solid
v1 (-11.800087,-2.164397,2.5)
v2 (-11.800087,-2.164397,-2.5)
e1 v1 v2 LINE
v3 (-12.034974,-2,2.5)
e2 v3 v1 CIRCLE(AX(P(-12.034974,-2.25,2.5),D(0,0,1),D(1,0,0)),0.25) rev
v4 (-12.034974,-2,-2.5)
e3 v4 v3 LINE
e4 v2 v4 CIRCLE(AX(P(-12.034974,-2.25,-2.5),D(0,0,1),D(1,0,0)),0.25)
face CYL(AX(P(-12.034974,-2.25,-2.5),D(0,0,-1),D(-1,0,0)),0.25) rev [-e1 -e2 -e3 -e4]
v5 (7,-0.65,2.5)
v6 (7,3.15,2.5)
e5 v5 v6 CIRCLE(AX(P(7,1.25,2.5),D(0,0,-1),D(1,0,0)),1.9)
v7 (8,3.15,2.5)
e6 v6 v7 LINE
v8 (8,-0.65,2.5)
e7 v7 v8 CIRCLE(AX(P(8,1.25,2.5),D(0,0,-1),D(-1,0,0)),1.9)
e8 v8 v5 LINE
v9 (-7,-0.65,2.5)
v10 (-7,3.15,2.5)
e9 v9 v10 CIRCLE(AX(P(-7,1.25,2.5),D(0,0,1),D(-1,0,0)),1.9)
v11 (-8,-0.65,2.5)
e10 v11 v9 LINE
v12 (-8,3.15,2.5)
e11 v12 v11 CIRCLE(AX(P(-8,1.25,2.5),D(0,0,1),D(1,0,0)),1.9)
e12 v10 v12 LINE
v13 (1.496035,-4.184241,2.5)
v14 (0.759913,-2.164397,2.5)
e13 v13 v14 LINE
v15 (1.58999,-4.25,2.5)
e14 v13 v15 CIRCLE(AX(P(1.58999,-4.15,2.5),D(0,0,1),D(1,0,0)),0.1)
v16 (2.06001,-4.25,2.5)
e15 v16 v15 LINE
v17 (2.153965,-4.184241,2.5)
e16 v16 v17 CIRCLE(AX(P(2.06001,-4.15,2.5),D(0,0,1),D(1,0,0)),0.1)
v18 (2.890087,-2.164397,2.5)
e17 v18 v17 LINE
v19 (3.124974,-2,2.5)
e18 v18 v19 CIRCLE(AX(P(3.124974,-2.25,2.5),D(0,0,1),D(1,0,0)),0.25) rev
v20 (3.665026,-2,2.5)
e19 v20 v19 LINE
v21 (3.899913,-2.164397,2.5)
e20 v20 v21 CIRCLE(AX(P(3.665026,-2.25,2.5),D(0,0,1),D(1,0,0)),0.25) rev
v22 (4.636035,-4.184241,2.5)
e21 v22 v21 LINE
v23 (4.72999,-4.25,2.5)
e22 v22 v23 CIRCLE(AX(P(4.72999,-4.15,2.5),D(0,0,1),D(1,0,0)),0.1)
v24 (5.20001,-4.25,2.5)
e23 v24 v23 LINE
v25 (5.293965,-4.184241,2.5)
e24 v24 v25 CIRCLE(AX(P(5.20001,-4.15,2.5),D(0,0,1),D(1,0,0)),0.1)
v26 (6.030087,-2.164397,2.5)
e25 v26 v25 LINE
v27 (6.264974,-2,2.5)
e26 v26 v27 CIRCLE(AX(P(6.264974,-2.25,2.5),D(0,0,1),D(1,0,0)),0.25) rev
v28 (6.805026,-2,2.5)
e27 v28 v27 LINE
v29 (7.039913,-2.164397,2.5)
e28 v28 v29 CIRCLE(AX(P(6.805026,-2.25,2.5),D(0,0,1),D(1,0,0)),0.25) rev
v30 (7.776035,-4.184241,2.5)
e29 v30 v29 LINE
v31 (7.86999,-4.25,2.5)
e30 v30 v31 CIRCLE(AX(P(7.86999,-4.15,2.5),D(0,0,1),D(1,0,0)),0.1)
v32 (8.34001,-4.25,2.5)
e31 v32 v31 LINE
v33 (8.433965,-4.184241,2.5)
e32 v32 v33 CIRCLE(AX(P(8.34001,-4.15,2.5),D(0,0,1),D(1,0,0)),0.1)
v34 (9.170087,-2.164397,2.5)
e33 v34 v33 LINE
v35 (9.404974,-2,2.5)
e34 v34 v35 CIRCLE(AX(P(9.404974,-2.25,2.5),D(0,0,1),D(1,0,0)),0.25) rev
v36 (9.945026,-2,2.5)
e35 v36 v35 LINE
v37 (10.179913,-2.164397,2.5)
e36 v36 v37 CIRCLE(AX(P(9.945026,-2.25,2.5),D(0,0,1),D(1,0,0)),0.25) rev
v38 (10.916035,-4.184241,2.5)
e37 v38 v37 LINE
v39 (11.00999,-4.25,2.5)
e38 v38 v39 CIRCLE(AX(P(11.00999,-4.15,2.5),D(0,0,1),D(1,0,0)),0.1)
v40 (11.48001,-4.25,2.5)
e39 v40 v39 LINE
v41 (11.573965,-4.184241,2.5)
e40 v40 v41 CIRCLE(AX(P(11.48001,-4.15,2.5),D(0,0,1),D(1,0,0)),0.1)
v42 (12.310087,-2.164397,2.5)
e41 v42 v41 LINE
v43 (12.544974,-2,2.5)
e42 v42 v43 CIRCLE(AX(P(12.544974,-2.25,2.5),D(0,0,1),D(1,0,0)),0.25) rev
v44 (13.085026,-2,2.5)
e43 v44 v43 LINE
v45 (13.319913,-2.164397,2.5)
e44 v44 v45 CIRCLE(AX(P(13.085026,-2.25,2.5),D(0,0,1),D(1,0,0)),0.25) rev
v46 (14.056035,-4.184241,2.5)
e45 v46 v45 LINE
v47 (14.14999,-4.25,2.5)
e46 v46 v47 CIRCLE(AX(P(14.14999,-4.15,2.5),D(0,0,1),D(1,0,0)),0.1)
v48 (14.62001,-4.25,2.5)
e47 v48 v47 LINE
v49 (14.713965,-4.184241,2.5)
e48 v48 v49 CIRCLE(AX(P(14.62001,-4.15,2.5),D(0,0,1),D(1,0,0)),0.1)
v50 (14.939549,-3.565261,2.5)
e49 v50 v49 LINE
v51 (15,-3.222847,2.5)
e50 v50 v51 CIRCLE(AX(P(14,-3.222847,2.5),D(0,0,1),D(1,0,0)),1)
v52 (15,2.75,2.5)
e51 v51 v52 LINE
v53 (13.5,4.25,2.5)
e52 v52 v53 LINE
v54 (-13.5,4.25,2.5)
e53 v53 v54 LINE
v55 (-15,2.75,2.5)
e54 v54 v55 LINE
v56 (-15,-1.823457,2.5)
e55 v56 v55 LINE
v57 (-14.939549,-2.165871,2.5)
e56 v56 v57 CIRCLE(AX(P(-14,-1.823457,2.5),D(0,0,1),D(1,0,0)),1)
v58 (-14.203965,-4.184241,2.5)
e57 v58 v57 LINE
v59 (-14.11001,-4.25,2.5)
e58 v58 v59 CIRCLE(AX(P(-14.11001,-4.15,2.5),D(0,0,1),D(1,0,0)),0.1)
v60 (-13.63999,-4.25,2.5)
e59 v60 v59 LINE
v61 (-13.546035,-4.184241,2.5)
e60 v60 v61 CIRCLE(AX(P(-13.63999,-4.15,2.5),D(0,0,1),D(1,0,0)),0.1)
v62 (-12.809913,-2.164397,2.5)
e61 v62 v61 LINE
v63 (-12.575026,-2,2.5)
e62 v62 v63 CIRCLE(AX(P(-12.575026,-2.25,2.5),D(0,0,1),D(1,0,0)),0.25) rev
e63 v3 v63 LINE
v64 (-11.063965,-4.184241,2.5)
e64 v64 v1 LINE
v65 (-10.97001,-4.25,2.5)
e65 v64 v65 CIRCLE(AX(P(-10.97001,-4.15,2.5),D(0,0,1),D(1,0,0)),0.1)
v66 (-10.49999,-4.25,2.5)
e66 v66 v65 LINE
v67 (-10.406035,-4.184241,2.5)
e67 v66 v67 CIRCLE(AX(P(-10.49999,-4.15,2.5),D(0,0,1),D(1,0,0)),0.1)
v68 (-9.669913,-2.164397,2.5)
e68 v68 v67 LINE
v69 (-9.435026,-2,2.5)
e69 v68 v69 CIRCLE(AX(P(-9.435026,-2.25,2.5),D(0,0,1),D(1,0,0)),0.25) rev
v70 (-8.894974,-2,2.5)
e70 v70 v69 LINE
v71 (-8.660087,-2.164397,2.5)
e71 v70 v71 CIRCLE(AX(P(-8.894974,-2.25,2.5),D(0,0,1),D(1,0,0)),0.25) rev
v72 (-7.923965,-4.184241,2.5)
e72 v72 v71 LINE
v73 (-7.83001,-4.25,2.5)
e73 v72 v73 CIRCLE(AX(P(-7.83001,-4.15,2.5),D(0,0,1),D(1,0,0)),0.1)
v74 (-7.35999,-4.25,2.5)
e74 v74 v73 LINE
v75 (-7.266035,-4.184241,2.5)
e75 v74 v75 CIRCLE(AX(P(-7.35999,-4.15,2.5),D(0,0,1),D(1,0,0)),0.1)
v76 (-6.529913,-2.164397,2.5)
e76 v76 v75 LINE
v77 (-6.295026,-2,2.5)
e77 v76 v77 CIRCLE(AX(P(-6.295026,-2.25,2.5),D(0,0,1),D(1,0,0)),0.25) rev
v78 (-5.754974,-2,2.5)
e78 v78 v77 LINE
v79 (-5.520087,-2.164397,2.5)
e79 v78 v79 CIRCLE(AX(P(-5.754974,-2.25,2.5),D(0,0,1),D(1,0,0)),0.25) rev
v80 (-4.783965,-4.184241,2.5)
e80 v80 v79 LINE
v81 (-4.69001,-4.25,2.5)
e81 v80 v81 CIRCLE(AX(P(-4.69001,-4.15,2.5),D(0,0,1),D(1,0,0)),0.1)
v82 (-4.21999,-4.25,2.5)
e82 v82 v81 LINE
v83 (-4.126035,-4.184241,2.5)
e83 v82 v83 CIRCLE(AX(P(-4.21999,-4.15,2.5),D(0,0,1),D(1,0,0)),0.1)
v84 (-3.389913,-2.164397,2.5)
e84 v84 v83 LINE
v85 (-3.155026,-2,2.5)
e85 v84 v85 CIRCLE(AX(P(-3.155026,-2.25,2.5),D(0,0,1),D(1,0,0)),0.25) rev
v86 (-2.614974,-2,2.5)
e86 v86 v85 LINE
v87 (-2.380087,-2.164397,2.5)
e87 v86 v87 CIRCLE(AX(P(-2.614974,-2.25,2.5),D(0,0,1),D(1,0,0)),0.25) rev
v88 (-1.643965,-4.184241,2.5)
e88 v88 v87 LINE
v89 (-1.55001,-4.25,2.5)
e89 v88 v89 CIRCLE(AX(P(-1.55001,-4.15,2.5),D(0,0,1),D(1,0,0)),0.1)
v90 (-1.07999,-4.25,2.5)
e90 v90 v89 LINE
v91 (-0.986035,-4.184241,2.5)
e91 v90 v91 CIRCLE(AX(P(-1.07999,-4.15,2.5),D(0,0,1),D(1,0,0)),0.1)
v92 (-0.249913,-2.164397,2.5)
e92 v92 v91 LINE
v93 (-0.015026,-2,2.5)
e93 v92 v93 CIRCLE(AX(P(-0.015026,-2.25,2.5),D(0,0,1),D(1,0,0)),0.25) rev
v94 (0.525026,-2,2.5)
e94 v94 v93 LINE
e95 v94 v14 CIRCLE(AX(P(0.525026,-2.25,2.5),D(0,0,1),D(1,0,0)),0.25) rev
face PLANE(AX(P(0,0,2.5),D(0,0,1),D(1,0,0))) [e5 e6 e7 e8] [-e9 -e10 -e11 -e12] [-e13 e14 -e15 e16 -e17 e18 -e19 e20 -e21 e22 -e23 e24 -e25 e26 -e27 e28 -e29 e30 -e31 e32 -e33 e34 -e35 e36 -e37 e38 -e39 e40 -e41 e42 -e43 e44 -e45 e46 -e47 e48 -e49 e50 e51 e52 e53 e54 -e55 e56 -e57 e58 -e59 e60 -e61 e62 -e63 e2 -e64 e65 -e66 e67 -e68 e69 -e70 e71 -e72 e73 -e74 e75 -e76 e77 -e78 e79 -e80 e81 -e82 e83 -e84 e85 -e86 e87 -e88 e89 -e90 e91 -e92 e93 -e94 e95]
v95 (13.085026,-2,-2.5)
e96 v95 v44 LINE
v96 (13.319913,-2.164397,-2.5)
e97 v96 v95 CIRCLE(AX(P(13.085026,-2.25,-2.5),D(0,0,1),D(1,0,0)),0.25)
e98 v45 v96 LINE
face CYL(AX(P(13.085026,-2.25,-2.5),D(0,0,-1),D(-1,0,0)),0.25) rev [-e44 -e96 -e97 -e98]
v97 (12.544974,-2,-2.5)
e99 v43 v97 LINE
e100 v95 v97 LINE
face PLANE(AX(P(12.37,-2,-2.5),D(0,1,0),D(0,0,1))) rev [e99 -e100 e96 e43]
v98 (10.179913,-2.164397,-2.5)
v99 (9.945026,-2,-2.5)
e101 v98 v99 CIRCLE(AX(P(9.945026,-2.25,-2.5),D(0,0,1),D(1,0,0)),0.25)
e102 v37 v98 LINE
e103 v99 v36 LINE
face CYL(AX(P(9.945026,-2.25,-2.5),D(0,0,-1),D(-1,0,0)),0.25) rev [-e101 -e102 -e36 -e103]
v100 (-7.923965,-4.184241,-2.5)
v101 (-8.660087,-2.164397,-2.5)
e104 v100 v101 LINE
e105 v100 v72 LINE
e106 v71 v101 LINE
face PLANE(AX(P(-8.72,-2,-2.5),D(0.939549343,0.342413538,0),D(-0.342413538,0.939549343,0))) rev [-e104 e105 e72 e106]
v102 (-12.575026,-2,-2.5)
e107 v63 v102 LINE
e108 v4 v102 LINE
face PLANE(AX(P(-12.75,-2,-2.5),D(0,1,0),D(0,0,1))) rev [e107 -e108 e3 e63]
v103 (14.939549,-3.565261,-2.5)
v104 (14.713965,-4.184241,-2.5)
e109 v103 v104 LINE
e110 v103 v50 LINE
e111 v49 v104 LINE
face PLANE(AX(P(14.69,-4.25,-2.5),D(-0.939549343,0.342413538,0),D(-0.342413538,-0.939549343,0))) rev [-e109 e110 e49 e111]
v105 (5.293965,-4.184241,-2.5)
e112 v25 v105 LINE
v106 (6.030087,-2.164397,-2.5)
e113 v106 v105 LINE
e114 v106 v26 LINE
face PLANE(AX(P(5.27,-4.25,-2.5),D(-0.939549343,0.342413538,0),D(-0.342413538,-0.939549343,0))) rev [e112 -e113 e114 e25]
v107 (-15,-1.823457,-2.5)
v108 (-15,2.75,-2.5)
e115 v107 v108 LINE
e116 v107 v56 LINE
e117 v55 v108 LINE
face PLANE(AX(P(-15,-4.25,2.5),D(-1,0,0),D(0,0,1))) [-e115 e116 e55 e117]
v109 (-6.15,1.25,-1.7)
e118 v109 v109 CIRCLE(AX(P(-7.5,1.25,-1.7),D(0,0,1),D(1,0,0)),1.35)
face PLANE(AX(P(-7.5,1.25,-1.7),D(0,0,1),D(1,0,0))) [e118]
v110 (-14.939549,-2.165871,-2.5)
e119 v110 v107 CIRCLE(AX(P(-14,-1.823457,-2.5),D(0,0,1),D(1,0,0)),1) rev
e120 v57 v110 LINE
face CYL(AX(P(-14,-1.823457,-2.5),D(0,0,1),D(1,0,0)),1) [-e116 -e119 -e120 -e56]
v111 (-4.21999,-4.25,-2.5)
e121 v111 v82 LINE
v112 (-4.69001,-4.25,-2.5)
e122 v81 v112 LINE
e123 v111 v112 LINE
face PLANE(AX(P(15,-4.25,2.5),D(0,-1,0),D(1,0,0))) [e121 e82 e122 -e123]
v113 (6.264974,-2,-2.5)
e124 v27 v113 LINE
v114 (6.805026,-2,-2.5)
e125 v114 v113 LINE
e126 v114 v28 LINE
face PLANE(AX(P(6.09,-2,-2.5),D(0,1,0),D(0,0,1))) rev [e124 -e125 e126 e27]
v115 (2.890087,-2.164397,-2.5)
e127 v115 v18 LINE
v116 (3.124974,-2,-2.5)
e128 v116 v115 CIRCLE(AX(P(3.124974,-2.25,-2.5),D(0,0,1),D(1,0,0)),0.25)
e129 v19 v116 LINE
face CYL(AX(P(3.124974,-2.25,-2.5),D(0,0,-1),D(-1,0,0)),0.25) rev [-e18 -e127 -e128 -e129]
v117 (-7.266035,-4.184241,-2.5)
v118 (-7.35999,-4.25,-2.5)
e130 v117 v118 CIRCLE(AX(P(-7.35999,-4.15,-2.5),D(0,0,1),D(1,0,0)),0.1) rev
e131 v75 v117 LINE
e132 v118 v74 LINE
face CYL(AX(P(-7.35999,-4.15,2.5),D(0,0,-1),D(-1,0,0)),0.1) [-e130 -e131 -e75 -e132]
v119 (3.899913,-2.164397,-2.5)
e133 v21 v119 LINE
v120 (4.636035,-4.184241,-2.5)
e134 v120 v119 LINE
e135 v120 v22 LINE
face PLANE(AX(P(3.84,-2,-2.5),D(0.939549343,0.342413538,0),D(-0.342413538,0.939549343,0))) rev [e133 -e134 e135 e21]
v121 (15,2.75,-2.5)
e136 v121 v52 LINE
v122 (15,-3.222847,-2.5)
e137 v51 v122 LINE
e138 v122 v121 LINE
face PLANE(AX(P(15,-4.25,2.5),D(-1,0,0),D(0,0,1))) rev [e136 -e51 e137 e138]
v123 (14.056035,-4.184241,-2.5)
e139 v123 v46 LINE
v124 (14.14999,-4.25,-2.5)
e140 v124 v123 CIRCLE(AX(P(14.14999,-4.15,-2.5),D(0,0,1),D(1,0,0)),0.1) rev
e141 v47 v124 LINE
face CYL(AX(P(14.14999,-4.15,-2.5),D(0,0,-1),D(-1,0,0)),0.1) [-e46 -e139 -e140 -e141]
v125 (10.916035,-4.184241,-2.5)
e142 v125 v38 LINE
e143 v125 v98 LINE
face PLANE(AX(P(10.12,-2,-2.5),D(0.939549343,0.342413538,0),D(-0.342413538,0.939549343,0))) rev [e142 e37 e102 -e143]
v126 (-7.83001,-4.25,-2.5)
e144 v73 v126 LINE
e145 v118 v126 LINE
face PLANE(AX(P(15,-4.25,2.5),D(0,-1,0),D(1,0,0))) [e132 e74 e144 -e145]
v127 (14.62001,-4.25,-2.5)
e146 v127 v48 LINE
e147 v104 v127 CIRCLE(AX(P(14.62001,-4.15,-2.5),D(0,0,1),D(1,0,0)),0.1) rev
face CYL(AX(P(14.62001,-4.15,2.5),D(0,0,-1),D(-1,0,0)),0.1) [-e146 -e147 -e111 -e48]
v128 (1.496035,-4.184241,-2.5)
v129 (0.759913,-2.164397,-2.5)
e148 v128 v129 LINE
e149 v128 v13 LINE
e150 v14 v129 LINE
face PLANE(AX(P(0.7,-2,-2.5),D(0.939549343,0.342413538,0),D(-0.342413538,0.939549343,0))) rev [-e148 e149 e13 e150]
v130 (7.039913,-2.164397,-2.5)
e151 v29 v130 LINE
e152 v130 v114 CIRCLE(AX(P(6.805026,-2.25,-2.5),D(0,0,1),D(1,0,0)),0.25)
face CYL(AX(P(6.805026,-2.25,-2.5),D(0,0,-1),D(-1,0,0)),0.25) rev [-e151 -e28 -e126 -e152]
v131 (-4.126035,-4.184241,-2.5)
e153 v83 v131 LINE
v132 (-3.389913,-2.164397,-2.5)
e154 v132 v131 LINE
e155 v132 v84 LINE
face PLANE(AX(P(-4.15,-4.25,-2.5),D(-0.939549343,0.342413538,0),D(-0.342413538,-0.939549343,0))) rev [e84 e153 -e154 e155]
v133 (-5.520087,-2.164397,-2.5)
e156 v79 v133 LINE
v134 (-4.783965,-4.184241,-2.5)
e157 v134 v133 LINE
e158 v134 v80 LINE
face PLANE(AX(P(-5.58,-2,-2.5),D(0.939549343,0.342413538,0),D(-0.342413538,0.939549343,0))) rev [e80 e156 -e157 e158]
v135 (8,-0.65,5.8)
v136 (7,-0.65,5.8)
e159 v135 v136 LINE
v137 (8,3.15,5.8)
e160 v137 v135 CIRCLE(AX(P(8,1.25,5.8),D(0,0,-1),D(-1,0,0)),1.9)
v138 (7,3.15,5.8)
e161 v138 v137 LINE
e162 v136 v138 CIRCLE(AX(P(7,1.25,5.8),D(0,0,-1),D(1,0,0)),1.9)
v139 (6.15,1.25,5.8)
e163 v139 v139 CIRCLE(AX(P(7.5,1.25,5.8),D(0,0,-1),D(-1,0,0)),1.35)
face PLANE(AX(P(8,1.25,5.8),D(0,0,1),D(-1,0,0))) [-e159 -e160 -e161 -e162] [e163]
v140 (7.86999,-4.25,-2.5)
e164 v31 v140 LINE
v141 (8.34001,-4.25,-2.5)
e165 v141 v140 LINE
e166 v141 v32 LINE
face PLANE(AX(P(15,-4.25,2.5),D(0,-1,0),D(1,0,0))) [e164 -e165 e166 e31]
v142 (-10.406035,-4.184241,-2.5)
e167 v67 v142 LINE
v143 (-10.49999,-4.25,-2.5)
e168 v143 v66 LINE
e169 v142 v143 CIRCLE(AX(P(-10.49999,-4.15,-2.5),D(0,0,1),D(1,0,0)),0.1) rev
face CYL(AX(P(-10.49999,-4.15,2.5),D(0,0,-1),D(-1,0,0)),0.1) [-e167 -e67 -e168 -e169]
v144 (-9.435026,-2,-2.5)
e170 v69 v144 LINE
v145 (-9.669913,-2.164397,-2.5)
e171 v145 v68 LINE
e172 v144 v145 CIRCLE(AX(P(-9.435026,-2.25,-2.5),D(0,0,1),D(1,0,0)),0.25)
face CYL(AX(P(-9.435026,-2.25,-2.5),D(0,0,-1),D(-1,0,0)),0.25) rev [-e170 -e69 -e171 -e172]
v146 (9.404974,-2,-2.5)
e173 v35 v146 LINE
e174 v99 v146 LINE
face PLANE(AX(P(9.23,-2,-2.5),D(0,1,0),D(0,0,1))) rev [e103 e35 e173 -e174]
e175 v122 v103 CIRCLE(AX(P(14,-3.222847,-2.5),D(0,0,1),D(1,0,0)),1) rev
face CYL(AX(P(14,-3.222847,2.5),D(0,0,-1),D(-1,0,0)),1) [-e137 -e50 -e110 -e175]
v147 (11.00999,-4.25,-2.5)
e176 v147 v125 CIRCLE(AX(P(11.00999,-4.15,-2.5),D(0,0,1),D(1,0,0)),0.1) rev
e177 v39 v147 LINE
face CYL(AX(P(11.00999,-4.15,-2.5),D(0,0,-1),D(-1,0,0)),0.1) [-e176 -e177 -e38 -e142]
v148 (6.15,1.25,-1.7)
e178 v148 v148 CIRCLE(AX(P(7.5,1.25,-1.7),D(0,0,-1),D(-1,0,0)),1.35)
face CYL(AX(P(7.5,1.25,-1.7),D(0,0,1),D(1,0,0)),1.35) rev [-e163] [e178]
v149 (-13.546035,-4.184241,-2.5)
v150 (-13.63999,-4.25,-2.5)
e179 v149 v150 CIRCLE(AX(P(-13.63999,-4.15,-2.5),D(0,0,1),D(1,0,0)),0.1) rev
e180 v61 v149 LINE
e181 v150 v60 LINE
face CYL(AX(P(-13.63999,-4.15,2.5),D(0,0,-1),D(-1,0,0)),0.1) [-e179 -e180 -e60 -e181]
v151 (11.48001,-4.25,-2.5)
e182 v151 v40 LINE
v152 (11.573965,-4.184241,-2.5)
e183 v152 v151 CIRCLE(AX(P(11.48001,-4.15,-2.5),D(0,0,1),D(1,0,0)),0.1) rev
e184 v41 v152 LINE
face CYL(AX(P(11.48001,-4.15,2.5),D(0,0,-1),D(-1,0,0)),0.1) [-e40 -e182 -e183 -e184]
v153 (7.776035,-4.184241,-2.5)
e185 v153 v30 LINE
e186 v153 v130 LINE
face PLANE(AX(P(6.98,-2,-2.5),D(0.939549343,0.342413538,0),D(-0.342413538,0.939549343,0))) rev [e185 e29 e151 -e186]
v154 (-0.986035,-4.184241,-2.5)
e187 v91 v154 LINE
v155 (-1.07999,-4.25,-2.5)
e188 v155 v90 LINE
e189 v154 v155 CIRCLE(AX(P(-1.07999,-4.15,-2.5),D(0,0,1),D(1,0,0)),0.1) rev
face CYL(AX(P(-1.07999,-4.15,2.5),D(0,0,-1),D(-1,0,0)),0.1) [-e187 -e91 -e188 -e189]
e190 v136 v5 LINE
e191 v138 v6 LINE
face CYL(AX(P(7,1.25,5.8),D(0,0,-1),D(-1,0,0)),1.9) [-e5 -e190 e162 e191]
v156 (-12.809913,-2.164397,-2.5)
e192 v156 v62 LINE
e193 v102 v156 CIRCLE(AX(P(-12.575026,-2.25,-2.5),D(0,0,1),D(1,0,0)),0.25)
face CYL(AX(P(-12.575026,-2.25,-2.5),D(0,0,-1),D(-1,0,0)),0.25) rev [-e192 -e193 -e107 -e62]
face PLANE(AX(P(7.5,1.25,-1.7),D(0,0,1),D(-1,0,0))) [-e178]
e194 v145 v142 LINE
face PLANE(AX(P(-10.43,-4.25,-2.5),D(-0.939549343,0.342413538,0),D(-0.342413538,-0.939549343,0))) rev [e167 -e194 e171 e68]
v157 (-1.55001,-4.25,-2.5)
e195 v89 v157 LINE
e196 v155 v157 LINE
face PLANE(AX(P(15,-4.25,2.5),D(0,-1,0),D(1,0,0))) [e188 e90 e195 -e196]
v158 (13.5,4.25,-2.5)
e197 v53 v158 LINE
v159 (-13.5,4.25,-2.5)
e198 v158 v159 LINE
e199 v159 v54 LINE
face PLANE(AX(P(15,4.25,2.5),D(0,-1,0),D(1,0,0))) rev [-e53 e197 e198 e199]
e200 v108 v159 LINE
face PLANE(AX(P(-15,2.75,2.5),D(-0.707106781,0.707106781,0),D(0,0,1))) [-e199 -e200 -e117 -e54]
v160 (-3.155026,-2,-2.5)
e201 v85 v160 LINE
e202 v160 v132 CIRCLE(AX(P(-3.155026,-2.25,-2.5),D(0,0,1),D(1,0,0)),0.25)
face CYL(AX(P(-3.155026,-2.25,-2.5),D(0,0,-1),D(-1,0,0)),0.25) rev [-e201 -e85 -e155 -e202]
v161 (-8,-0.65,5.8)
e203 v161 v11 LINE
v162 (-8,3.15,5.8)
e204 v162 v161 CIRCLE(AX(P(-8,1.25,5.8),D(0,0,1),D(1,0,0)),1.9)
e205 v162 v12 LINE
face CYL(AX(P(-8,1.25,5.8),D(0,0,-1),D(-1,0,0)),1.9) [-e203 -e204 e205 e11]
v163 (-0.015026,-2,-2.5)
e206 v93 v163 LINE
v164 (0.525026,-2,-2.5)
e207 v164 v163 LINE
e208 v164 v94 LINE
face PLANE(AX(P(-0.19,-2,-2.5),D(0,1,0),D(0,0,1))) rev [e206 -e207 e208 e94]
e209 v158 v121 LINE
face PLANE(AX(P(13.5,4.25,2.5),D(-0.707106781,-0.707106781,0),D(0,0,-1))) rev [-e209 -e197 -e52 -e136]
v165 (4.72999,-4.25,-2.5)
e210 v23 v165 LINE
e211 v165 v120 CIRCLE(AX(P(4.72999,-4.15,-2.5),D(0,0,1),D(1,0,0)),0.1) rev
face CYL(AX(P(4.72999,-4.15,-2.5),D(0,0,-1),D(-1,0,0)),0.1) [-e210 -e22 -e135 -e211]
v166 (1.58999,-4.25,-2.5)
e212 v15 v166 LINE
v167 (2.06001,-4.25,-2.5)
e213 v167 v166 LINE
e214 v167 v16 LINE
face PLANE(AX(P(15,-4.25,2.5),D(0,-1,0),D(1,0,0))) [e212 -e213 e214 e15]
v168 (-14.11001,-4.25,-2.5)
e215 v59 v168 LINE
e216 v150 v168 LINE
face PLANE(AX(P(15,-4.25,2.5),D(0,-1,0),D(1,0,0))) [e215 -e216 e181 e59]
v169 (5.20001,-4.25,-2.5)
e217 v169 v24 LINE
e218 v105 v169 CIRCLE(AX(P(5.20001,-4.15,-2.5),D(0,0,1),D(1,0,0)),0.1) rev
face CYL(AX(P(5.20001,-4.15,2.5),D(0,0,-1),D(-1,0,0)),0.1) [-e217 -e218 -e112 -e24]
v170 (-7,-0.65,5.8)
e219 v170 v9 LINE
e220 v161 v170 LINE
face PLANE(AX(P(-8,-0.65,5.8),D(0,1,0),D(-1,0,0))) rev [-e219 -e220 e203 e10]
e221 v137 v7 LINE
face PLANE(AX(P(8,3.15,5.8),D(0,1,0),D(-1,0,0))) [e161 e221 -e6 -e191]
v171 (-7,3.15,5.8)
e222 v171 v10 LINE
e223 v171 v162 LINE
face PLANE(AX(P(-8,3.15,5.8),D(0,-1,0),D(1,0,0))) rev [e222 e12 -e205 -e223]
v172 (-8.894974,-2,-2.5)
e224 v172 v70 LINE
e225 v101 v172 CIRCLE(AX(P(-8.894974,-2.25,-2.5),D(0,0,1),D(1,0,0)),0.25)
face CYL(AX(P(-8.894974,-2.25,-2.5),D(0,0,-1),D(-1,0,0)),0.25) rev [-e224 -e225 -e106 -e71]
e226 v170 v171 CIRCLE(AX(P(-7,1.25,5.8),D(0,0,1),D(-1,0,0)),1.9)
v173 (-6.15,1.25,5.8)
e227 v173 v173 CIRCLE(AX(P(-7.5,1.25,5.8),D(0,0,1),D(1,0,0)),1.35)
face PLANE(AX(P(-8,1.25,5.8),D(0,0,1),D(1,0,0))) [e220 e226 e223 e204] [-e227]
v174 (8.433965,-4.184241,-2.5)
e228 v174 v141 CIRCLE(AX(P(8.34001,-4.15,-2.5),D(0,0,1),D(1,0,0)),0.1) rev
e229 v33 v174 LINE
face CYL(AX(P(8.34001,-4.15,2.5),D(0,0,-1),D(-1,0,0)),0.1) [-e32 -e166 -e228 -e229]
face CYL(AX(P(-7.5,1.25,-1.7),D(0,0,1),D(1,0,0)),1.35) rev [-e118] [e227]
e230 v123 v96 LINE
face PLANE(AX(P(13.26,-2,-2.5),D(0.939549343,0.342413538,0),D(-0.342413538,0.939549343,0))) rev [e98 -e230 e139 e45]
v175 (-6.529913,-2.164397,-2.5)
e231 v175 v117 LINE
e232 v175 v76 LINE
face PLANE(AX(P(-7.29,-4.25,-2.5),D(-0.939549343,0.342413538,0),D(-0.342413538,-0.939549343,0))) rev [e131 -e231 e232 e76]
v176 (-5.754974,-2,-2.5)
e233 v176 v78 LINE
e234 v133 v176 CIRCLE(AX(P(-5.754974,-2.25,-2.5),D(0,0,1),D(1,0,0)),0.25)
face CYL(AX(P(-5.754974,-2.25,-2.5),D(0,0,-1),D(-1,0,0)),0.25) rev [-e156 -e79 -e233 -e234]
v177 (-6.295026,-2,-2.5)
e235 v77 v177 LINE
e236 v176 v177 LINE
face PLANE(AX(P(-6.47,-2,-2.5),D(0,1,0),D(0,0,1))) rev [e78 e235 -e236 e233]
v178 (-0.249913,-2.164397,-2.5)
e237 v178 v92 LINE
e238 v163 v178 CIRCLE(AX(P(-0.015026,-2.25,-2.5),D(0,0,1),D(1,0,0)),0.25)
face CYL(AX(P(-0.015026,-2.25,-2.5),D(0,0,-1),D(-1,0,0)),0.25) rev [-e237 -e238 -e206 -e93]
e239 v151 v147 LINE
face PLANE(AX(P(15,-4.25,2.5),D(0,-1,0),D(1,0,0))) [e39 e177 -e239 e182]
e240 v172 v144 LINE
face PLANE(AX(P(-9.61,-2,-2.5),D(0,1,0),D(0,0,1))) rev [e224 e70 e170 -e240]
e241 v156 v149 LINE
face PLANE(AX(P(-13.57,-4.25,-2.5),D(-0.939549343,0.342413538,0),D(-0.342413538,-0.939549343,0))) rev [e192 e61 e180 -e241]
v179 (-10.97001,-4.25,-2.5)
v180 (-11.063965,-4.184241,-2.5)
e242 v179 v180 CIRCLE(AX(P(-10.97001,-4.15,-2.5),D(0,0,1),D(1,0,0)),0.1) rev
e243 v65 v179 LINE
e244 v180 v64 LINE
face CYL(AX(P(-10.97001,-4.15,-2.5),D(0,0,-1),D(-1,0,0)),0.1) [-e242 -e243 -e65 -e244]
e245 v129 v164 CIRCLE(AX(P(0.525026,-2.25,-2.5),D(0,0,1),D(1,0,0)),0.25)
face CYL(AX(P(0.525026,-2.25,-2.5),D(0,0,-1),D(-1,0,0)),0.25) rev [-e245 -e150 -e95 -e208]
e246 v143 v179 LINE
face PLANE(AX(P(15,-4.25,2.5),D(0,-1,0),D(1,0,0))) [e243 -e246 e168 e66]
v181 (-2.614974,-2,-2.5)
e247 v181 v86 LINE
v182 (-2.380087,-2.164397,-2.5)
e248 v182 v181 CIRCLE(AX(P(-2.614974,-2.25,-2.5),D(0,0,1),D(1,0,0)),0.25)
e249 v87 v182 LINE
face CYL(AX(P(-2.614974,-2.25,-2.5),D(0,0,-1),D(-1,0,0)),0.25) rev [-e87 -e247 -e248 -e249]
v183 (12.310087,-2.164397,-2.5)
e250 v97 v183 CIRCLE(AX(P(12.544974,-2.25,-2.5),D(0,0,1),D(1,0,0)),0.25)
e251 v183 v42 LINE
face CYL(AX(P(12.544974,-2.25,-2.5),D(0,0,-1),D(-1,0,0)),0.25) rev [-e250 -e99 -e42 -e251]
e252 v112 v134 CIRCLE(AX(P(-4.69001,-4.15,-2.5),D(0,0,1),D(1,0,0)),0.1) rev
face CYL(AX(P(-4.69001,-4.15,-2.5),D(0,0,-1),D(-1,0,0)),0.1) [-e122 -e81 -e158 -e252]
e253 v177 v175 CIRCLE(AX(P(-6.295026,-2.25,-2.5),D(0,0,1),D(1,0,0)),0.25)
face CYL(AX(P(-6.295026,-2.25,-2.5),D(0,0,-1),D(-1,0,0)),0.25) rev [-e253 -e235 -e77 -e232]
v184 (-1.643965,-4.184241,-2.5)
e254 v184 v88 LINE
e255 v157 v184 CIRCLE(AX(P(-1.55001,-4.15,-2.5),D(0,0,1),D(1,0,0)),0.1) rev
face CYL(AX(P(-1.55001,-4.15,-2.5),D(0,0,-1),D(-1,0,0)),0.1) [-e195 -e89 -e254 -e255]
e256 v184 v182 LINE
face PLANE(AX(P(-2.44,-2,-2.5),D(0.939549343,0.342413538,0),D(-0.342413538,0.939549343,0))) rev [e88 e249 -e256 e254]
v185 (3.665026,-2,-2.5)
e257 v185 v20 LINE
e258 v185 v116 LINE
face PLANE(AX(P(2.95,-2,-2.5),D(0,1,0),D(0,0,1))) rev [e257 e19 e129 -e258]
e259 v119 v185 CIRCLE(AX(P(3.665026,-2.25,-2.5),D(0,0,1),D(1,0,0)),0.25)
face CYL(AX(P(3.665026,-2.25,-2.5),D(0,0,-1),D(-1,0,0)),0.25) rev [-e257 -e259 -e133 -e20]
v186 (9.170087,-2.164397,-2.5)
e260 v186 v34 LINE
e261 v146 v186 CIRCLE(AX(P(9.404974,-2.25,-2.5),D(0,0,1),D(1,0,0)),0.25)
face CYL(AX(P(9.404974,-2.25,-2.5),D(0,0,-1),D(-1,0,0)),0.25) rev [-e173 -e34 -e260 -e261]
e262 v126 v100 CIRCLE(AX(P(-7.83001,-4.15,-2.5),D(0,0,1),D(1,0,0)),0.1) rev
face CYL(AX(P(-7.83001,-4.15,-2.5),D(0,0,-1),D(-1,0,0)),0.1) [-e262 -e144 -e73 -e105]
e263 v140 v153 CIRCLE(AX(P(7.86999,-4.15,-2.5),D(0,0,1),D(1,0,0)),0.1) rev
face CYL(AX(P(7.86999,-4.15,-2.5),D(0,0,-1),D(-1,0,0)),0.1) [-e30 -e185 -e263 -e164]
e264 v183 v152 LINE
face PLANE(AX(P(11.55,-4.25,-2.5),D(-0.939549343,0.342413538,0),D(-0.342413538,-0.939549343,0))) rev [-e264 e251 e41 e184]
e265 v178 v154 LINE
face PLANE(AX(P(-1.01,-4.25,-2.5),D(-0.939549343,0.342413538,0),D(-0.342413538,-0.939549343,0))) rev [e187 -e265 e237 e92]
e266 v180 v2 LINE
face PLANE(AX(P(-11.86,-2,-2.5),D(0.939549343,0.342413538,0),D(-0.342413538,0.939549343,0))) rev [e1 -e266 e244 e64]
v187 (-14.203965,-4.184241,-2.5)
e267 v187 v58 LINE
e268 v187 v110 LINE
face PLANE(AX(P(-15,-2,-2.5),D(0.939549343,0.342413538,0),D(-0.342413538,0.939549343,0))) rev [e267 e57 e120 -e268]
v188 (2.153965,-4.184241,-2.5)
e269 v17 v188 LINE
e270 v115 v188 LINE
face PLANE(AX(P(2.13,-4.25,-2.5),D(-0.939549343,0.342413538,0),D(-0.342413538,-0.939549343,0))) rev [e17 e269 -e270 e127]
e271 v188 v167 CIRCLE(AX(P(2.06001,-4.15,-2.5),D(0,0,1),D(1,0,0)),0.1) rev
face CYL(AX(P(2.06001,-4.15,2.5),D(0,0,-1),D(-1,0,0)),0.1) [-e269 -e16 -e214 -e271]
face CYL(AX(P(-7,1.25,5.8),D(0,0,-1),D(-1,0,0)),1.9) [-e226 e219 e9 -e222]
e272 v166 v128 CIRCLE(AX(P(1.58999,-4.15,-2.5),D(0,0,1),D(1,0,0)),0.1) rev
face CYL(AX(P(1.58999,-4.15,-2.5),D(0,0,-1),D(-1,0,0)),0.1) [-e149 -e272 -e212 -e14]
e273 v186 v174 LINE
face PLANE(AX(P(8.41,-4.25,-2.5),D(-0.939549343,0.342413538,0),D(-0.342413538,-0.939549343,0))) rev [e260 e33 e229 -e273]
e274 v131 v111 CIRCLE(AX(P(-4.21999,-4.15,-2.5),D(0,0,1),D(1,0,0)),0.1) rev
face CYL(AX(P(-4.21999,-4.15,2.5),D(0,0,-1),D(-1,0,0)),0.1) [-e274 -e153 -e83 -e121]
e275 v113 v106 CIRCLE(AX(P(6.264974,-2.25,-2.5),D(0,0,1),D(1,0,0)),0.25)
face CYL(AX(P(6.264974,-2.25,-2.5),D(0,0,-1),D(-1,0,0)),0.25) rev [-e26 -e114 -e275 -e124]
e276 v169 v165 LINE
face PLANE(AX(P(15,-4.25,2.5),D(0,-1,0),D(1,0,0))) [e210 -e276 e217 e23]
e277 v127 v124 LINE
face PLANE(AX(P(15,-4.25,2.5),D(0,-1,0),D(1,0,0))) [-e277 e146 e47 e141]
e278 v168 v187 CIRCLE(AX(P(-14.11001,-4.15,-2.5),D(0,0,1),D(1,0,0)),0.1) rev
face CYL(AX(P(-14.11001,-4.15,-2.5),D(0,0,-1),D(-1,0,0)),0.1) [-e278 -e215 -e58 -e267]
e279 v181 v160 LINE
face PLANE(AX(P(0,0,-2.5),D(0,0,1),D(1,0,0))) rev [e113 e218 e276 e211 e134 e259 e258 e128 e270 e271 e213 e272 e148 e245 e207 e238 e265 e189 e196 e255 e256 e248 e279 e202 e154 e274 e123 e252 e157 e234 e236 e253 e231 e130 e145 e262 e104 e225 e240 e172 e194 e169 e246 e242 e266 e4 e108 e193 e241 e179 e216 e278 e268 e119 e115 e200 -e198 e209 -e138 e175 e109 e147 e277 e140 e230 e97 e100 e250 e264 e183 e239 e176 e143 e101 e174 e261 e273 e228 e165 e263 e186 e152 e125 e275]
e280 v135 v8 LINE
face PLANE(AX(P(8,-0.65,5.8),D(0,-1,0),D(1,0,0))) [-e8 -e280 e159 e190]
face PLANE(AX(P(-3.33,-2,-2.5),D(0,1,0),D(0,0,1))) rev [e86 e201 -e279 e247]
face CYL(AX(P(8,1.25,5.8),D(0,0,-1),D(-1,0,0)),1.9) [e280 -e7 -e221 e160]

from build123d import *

# Parameters (mm, degrees)
SZKIC1_W                    = 30
SZKIC1_H                    = 8.5
DODANIE_WYCI_GNI_CIE1_DEPTH = 2.5
WYTNIJ_WYCI_GNI_CIE1_DEPTH  = 16.789632675
ZAOKR_GLENIE1_R             = 0.25
ZAOKR_GLENIE2_R             = 0.1
SZYK_START                  = -2.5
SZYK_LINIOWY1_DEPTH         = 5
ZAOKR_GLENIE3_R             = 1
DODANIE_WYCI_GNI_CIE2_DEPTH = 3.3
SZKIC4_R                    = 1.35
WYTNIJ_WYCI_GNI_CIE2_DEPTH  = 7.5
SFAZOWANIE1_SIZE            = 1.5


# Read off the part's stored shape, not the designer's step: Szyk liniowy1
with BuildPart() as part:
    # Szkic1 → Dodanie-wyciągnięcie1 (new, symmetric)
    with BuildSketch(Plane.XY):
        Rectangle(SZKIC1_W, SZKIC1_H)
    extrude(amount=DODANIE_WYCI_GNI_CIE1_DEPTH, both=True)

    # Szkic2 → Wytnij-wyciągnięcie1 (cut, symmetric)
    with BuildSketch(Plane.XY):
        Polygon((-13.57, -4.25), (-12.75, -2), (-11.86, -2), (-11.04, -4.25), align=None)
    extrude(amount=WYTNIJ_WYCI_GNI_CIE1_DEPTH, both=True, mode=Mode.SUBTRACT)

    # Zaokrąglenie1
    zaokr_glenie1_edges = [part.edges().sort_by_distance(p)[0] for p in [
        (-12.75, -2, 0),
        (-11.86, -2, 0),
    ]]
    fillet(zaokr_glenie1_edges, radius=ZAOKR_GLENIE1_R)

    # Zaokrąglenie2
    zaokr_glenie2_edges = [part.edges().sort_by_distance(p)[0] for p in [
        (-11.04, -4.25, 0),
        (-13.57, -4.25, 0),
    ]]
    fillet(zaokr_glenie2_edges, radius=ZAOKR_GLENIE2_R)

    # Szyk liniowy1 outline → Szyk liniowy1 (cut)
    with BuildSketch(Plane.XY.offset(SZYK_START)):
        with BuildLine():
            ThreePointArc((-8.660086567, -2.164396615), (-8.751622667, -2.045181975), (-8.894973903, -2))
            Line((-8.894973903, -2), (-9.435026097, -2))
            ThreePointArc((-9.435026097, -2), (-9.578377333, -2.045181975), (-9.669913433, -2.164396615))
            Line((-9.669913433, -2.164396615), (-10.406034627, -4.184241354))
            ThreePointArc((-10.406034627, -4.184241354), (-10.442649067, -4.23192721), (-10.499989561, -4.25))
            Line((-10.499989561, -4.25), (-7.830010439, -4.25))
            ThreePointArc((-7.830010439, -4.25), (-7.887350933, -4.23192721), (-7.923965373, -4.184241354))
            Line((-7.923965373, -4.184241354), (-8.660086567, -2.164396615))
        make_face()
        with BuildLine():
            ThreePointArc((14.713965373, -4.184241354), (14.677350933, -4.23192721), (14.620010439, -4.25))
            Line((14.620010439, -4.25), (15, -4.25))
            Line((15, -4.25), (15, -3.399390244))
            Line((15, -3.399390244), (14.713965373, -4.184241354))
        make_face()
        with BuildLine():
            ThreePointArc((11.573965373, -4.184241354), (11.537350933, -4.23192721), (11.480010439, -4.25))
            Line((11.480010439, -4.25), (14.149989561, -4.25))
            ThreePointArc((14.149989561, -4.25), (14.092649067, -4.23192721), (14.056034627, -4.184241354))
            Line((14.056034627, -4.184241354), (13.319913433, -2.164396615))
            ThreePointArc((13.319913433, -2.164396615), (13.228377333, -2.045181975), (13.085026097, -2))
            Line((13.085026097, -2), (12.544973903, -2))
            ThreePointArc((12.544973903, -2), (12.401622667, -2.045181975), (12.310086567, -2.164396615))
            Line((12.310086567, -2.164396615), (11.573965373, -4.184241354))
        make_face()
        with BuildLine():
            ThreePointArc((8.433965373, -4.184241354), (8.397350933, -4.23192721), (8.340010439, -4.25))
            Line((8.340010439, -4.25), (11.009989561, -4.25))
            ThreePointArc((11.009989561, -4.25), (10.952649067, -4.23192721), (10.916034627, -4.184241354))
            Line((10.916034627, -4.184241354), (10.179913433, -2.164396615))
            ThreePointArc((10.179913433, -2.164396615), (10.088377333, -2.045181975), (9.945026097, -2))
            Line((9.945026097, -2), (9.404973903, -2))
            ThreePointArc((9.404973903, -2), (9.261622667, -2.045181975), (9.170086567, -2.164396615))
            Line((9.170086567, -2.164396615), (8.433965373, -4.184241354))
        make_face()
        with BuildLine():
            ThreePointArc((5.293965373, -4.184241354), (5.257350933, -4.23192721), (5.200010439, -4.25))
            Line((5.200010439, -4.25), (7.869989561, -4.25))
            ThreePointArc((7.869989561, -4.25), (7.812649067, -4.23192721), (7.776034627, -4.184241354))
            Line((7.776034627, -4.184241354), (7.039913433, -2.164396615))
            ThreePointArc((7.039913433, -2.164396615), (6.948377333, -2.045181975), (6.805026097, -2))
            Line((6.805026097, -2), (6.264973903, -2))
            ThreePointArc((6.264973903, -2), (6.121622667, -2.045181975), (6.030086567, -2.164396615))
            Line((6.030086567, -2.164396615), (5.293965373, -4.184241354))
        make_face()
        with BuildLine():
            ThreePointArc((2.153965373, -4.184241354), (2.117350933, -4.23192721), (2.060010439, -4.25))
            Line((2.060010439, -4.25), (4.729989561, -4.25))
            ThreePointArc((4.729989561, -4.25), (4.672649067, -4.23192721), (4.636034627, -4.184241354))
            Line((4.636034627, -4.184241354), (3.899913433, -2.164396615))
            ThreePointArc((3.899913433, -2.164396615), (3.808377333, -2.045181975), (3.665026097, -2))
            Line((3.665026097, -2), (3.124973903, -2))
            ThreePointArc((3.124973903, -2), (2.981622667, -2.045181975), (2.890086567, -2.164396615))
            Line((2.890086567, -2.164396615), (2.153965373, -4.184241354))
        make_face()
        with BuildLine():
            ThreePointArc((-0.986034627, -4.184241354), (-1.022649067, -4.23192721), (-1.079989561, -4.25))
            Line((-1.079989561, -4.25), (1.589989561, -4.25))
            ThreePointArc((1.589989561, -4.25), (1.532649067, -4.23192721), (1.496034627, -4.184241354))
            Line((1.496034627, -4.184241354), (0.759913433, -2.164396615))
            ThreePointArc((0.759913433, -2.164396615), (0.668377333, -2.045181975), (0.525026097, -2))
            Line((0.525026097, -2), (-0.015026097, -2))
            ThreePointArc((-0.015026097, -2), (-0.158377333, -2.045181975), (-0.249913433, -2.164396615))
            Line((-0.249913433, -2.164396615), (-0.986034627, -4.184241354))
        make_face()
        with BuildLine():
            ThreePointArc((-4.126034627, -4.184241354), (-4.162649067, -4.23192721), (-4.219989561, -4.25))
            Line((-4.219989561, -4.25), (-1.550010439, -4.25))
            ThreePointArc((-1.550010439, -4.25), (-1.607350933, -4.23192721), (-1.643965373, -4.184241354))
            Line((-1.643965373, -4.184241354), (-2.380086567, -2.164396615))
            ThreePointArc((-2.380086567, -2.164396615), (-2.471622667, -2.045181975), (-2.614973903, -2))
            Line((-2.614973903, -2), (-3.155026097, -2))
            ThreePointArc((-3.155026097, -2), (-3.298377333, -2.045181975), (-3.389913433, -2.164396615))
            Line((-3.389913433, -2.164396615), (-4.126034627, -4.184241354))
        make_face()
        with BuildLine():
            ThreePointArc((-7.266034627, -4.184241354), (-7.302649067, -4.23192721), (-7.359989561, -4.25))
            Line((-7.359989561, -4.25), (-4.690010439, -4.25))
            ThreePointArc((-4.690010439, -4.25), (-4.747350933, -4.23192721), (-4.783965373, -4.184241354))
            Line((-4.783965373, -4.184241354), (-5.520086567, -2.164396615))
            ThreePointArc((-5.520086567, -2.164396615), (-5.611622667, -2.045181975), (-5.754973903, -2))
            Line((-5.754973903, -2), (-6.295026097, -2))
            ThreePointArc((-6.295026097, -2), (-6.438377333, -2.045181975), (-6.529913433, -2.164396615))
            Line((-6.529913433, -2.164396615), (-7.266034627, -4.184241354))
        make_face()
        with BuildLine():
            Line((-15, -4.25), (-14.110010439, -4.25))
            ThreePointArc((-14.110010439, -4.25), (-14.167350933, -4.23192721), (-14.203965373, -4.184241354))
            Line((-14.203965373, -4.184241354), (-14.940086567, -2.164396615))
            ThreePointArc((-14.940086567, -2.164396615), (-14.964838585, -2.11456312), (-15, -2.071438713))
            Line((-15, -2.071438713), (-15, -4.25))
        make_face()
    extrude(amount=SZYK_LINIOWY1_DEPTH, mode=Mode.SUBTRACT)

    # Zaokrąglenie3
    zaokr_glenie3_edges = [part.edges().sort_by_distance(p)[0] for p in [
        (-15, -2.071438713, 0),
        (15, -3.399390244, 0),
    ]]
    fillet(zaokr_glenie3_edges, radius=ZAOKR_GLENIE3_R)

    # Szkic3 → Dodanie-wyciągnięcie2 (add)
    with BuildSketch(Plane.XY.offset(2.5)):
        with BuildLine():
            Line((-8, 3.15), (-7, 3.15))
            ThreePointArc((-7, 3.15), (-5.1, 1.25), (-7, -0.65))
            Line((-7, -0.65), (-8, -0.65))
            ThreePointArc((-8, -0.65), (-9.9, 1.25), (-8, 3.15))
        make_face()
    dodanie_wyci_gni_cie2 = extrude(amount=DODANIE_WYCI_GNI_CIE2_DEPTH)

    # Szkic4 → Wytnij-wyciągnięcie2 (cut)
    with BuildSketch(Plane.XY.offset(5.8)):
        with Locations((-7.5, 1.25)):
            Circle(SZKIC4_R)
    wytnij_wyci_gni_cie2 = extrude(amount=-WYTNIJ_WYCI_GNI_CIE2_DEPTH, mode=Mode.SUBTRACT)

    # Lustro1: Dodanie-wyciągnięcie2, Wytnij-wyciągnięcie2 across plane
    add(dodanie_wyci_gni_cie2.mirror(Plane(origin=(0, 0, 0), x_dir=(0, 0, 1), z_dir=(1, 0, 0))))
    add(wytnij_wyci_gni_cie2.mirror(Plane(origin=(0, 0, 0), x_dir=(0, 0, 1), z_dir=(1, 0, 0))), mode=Mode.SUBTRACT)

    # Sfazowanie1
    sfazowanie1_edges = [part.edges().sort_by_distance(p)[0] for p in [
        (-15, 4.25, 0),
        (15, 4.25, 0),
    ]]
    chamfer(sfazowanie1_edges, length=SFAZOWANIE1_SIZE)


solid = part.part
